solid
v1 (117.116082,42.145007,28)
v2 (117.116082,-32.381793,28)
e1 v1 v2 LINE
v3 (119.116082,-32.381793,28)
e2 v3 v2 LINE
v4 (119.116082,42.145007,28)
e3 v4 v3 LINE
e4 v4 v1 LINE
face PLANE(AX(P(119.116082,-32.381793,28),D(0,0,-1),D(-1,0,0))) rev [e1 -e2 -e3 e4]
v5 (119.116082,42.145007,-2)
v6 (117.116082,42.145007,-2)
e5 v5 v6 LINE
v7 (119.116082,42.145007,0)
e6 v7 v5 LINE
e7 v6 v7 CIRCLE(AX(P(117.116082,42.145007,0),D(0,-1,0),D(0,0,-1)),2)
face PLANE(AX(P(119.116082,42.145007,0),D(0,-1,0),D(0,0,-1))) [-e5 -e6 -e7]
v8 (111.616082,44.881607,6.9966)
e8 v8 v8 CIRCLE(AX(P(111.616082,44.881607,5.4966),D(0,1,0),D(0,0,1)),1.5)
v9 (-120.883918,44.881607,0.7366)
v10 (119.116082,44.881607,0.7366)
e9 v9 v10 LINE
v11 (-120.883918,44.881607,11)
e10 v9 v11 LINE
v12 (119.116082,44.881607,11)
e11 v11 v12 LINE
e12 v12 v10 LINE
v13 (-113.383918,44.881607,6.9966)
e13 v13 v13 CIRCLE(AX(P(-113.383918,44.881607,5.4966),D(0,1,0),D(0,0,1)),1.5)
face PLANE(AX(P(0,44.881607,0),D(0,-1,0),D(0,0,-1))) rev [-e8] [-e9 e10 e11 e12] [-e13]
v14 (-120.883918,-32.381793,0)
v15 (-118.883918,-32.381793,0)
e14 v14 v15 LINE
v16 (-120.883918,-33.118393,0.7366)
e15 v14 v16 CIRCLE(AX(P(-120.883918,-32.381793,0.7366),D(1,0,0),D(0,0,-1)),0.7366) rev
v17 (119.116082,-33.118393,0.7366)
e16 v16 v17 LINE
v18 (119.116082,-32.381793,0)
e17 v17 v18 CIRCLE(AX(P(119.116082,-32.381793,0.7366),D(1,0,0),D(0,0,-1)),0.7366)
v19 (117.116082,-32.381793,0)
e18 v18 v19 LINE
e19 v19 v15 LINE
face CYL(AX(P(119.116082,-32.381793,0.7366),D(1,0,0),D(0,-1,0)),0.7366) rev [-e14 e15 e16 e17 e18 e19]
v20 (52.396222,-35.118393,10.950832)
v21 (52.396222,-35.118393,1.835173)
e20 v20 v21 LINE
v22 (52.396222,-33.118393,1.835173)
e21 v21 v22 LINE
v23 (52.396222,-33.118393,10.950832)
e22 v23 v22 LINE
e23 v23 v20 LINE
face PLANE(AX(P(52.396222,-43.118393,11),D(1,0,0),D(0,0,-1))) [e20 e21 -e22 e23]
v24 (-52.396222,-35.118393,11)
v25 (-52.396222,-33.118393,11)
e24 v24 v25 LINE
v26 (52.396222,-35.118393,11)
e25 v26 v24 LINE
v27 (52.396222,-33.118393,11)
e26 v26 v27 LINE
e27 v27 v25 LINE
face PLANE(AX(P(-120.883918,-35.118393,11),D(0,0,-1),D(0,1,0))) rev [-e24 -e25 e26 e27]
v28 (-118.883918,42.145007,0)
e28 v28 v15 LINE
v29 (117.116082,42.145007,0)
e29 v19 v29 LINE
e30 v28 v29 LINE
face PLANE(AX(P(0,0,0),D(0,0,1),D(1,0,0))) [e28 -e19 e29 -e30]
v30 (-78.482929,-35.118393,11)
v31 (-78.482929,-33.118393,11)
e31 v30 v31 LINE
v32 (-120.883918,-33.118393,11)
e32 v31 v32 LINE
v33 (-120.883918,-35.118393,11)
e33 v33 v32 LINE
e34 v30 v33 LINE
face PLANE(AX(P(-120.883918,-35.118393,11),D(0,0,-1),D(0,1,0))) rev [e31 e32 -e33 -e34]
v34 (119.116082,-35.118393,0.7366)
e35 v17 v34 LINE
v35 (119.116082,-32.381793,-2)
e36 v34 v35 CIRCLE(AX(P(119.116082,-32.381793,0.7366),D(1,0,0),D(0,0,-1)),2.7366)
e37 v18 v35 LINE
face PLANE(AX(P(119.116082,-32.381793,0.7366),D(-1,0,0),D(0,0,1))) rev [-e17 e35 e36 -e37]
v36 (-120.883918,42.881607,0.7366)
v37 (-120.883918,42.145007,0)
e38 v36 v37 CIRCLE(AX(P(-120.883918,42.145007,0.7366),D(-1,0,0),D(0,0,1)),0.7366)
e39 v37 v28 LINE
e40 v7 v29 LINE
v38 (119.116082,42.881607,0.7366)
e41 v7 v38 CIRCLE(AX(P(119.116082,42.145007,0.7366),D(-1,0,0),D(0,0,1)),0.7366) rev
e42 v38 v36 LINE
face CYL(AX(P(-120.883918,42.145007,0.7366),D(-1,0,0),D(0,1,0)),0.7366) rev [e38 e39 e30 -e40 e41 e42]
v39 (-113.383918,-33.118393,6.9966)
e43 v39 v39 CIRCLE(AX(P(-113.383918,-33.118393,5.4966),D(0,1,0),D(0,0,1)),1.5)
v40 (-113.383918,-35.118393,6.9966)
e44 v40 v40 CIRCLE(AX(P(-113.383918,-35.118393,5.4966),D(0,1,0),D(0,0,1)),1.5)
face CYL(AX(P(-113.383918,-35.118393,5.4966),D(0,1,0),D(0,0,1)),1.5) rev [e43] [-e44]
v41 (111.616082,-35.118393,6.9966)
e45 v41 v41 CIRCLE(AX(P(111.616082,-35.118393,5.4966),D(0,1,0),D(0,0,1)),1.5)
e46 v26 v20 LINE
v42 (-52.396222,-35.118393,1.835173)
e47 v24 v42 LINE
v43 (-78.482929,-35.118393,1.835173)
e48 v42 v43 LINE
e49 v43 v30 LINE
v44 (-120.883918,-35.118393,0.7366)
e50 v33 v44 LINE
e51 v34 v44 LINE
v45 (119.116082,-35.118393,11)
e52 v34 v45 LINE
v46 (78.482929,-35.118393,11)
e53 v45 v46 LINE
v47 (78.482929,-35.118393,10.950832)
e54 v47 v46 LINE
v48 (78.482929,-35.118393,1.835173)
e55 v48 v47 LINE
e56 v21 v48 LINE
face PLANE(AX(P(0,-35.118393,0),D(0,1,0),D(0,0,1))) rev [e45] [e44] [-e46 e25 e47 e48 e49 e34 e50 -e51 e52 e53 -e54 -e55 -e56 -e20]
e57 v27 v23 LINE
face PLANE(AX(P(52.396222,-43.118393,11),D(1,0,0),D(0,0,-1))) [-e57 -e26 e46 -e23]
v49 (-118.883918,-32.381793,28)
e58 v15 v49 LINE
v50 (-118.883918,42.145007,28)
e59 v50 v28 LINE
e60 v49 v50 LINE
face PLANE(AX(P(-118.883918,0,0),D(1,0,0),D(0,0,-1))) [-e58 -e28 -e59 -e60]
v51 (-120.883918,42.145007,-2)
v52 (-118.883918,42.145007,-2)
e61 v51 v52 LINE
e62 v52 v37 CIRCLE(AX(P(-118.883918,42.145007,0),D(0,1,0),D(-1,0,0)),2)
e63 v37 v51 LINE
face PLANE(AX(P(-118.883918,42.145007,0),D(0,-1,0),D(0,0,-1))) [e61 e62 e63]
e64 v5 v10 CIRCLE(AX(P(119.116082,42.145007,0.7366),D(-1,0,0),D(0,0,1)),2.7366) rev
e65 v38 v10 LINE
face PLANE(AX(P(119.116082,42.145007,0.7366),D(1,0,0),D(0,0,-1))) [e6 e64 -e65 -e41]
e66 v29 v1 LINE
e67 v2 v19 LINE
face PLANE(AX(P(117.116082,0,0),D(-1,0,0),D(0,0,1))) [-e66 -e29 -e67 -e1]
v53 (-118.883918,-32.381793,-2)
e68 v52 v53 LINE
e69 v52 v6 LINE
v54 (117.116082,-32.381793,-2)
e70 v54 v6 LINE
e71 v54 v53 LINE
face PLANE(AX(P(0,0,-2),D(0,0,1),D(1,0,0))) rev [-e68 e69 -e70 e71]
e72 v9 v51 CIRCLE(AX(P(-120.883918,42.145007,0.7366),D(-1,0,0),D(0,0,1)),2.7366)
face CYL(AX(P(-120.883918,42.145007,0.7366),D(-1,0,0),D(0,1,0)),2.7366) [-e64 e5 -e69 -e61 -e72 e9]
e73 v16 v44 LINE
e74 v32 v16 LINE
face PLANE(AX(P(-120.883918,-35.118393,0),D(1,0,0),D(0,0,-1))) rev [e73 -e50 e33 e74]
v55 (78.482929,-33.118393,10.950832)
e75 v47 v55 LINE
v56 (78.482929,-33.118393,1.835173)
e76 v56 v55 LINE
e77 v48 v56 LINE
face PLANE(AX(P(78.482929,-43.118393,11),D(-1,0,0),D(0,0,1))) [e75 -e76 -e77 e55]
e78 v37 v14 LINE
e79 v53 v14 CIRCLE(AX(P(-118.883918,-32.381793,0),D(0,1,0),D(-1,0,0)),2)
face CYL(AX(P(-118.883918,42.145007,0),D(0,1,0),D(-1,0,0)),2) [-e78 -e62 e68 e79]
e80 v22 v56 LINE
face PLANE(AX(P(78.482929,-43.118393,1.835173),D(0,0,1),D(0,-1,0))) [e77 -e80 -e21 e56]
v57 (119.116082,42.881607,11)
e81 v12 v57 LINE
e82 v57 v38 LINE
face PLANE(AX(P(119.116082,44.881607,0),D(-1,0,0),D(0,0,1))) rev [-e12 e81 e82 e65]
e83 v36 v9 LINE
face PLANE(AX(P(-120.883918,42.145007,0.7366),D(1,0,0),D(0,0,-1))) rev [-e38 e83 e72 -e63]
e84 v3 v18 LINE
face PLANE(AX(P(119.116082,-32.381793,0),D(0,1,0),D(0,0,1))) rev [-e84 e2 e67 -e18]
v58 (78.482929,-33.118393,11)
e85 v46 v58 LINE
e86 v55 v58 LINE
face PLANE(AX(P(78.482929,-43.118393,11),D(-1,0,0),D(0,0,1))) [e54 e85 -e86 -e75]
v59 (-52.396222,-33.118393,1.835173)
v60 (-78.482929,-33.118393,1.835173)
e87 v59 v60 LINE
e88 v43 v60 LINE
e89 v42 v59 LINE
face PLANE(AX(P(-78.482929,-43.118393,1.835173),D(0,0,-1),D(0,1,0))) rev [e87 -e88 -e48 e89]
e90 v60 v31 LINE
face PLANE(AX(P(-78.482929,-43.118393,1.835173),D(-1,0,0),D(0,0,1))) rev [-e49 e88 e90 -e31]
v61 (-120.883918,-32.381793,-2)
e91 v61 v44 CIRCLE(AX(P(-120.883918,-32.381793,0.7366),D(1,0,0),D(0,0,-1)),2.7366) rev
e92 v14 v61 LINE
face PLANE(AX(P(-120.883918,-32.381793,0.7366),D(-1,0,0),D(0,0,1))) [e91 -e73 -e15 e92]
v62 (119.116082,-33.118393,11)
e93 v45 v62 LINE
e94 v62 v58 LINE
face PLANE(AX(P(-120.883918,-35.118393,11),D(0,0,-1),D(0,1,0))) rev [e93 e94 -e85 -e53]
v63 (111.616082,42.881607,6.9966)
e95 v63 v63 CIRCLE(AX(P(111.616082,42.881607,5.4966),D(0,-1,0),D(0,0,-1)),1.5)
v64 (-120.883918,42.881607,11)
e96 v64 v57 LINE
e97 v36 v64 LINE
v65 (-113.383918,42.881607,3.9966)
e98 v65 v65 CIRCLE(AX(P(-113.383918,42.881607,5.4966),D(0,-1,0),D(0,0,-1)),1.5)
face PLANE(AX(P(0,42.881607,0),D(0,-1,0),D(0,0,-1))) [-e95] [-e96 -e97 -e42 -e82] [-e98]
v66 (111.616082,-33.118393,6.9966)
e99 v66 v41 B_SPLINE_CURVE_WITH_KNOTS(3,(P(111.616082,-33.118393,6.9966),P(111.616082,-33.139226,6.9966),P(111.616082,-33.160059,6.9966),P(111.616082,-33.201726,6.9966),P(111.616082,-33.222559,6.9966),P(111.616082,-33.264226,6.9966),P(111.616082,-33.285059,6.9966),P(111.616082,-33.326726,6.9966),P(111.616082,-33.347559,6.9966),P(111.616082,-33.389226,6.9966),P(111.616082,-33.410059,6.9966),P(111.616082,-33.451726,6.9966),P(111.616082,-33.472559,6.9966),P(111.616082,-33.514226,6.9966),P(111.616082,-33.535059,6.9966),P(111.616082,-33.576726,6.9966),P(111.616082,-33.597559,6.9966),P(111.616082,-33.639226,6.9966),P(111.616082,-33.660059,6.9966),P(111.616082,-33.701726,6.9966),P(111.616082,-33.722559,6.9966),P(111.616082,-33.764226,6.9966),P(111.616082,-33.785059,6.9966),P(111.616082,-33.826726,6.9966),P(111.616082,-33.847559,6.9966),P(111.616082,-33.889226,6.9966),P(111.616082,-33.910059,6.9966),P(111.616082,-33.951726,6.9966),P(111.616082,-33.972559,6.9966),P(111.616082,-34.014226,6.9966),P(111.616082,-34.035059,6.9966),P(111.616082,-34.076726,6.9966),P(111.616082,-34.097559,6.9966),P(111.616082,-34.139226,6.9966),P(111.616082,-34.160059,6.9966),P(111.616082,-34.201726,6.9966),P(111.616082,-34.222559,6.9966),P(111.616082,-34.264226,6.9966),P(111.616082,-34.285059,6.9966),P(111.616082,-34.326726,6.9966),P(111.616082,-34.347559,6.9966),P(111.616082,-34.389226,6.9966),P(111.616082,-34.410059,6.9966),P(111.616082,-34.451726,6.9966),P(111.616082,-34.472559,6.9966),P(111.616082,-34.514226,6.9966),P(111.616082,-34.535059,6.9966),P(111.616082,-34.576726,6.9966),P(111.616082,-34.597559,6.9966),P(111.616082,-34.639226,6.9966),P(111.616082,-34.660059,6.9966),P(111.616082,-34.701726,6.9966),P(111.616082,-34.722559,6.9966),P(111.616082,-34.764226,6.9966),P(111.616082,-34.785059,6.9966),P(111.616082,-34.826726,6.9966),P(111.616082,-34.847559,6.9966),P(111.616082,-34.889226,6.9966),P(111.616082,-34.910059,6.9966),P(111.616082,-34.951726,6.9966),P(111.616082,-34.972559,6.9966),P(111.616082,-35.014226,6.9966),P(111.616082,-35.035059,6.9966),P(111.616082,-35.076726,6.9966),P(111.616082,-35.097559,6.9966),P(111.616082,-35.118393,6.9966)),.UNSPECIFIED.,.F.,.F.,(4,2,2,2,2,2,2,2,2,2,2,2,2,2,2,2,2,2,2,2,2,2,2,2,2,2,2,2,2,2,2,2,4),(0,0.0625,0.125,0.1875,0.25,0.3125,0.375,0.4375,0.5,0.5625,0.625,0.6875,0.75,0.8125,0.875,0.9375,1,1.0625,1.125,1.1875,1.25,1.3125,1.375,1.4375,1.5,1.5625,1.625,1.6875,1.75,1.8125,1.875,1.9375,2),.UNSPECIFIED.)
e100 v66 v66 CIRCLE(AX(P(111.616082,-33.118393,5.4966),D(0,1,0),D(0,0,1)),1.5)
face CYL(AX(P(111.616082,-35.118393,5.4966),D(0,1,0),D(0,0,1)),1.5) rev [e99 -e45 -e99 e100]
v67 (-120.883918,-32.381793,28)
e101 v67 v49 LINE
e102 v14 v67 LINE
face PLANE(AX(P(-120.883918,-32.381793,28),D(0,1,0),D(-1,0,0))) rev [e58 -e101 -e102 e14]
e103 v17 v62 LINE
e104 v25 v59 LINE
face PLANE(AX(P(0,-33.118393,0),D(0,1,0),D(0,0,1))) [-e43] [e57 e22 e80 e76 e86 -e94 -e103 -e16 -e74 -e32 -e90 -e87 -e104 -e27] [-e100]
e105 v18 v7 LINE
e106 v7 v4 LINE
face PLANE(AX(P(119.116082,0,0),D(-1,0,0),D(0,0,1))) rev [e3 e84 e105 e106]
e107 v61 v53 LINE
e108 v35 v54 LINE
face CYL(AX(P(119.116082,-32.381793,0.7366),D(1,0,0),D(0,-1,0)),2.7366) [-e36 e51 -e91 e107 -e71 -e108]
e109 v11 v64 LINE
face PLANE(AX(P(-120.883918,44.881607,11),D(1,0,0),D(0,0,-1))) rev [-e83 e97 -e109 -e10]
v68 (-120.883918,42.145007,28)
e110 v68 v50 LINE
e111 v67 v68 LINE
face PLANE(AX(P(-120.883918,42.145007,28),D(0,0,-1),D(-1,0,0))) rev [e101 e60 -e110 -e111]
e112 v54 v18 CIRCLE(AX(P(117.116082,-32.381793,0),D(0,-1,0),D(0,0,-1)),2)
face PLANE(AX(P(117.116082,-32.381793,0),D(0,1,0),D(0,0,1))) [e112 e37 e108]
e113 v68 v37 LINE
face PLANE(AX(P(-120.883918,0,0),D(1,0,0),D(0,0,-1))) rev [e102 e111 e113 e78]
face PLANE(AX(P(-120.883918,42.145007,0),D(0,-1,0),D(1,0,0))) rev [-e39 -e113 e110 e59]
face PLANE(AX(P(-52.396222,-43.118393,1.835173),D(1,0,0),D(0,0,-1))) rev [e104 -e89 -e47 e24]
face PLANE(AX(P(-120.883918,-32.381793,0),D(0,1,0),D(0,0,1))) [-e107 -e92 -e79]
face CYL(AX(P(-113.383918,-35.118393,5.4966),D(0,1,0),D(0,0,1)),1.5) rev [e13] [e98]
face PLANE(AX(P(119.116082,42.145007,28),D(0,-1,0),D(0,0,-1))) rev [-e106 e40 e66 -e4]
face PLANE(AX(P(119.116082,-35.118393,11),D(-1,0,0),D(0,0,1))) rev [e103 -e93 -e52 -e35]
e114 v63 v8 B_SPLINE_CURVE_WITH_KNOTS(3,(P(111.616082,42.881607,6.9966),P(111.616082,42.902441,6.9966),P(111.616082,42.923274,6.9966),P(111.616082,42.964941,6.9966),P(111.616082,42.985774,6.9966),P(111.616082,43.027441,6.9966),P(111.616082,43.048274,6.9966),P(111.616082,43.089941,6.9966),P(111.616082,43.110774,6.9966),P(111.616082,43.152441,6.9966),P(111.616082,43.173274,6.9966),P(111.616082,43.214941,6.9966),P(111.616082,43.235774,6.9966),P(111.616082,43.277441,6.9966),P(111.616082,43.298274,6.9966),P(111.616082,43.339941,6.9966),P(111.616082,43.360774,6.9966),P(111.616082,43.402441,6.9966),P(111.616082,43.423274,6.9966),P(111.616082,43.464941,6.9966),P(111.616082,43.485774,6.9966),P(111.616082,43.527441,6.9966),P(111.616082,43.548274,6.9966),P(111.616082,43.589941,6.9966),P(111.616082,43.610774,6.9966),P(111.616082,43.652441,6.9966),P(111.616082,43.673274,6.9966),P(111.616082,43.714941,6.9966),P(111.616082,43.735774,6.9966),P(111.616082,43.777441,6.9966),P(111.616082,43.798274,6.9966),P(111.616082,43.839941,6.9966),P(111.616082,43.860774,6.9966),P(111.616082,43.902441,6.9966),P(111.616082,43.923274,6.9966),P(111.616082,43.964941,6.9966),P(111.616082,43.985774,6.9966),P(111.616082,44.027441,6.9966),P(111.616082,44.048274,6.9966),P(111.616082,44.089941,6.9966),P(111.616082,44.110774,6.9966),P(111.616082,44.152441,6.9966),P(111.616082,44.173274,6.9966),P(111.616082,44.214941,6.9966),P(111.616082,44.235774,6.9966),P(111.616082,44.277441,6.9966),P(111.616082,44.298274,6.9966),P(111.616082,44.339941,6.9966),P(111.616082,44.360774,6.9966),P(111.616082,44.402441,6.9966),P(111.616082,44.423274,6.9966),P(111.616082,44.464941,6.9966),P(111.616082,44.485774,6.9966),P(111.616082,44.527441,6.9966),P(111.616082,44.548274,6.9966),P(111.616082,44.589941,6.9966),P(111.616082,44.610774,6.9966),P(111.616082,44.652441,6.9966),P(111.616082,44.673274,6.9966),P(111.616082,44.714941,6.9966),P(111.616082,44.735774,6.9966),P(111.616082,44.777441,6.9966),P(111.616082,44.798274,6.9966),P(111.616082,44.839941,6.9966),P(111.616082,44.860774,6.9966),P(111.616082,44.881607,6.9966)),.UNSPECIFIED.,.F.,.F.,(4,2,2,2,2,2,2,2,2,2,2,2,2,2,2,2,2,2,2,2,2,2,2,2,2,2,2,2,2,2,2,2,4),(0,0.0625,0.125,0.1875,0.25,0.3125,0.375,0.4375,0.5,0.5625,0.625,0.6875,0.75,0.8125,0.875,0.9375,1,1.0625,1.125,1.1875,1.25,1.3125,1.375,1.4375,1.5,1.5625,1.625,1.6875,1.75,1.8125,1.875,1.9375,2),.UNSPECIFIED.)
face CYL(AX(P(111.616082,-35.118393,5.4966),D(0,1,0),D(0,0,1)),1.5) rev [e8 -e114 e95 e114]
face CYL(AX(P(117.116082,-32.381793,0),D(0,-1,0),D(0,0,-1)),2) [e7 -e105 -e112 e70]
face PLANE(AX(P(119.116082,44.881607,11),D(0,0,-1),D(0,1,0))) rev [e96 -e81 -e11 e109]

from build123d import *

# Parameters (mm, degrees)
SKETCH31_W                     = 240
SKETCH31_H                     = 80
BASE_FLANGE1_DEPTH             = 2
EDGE_FLANGE1_STRIP_W           = 9.4732
EDGE_FLANGE1_STRIP_H           = 2
EDGE_FLANGE1_STRIP_CUT_DEPTH   = 240
EDGE_FLANGE1_STRIP_2_W         = 9.4732
EDGE_FLANGE1_STRIP_2_H         = 2
EDGE_FLANGE1_STRIP_CUT_2_DEPTH = 240
EDGE_FLANGE1_DEPTH             = 240
EDGE_FLANGE1_BEND_DEPTH        = 240
EDGE_FLANGE2_START             = -32.381792537
EDGE_FLANGE2_DEPTH             = 74.5268
EDGE_FLANGE2_2_OUTLINE_W       = 2
EDGE_FLANGE2_2_OUTLINE_H       = 28
EDGE_FLANGE2_2_DEPTH           = 74.5268
SKETCH52_W                     = 26.086706926
SKETCH52_H                     = 9.115658902
CUT_EXTRUDE2_DEPTH             = 10
SKETCH53_W                     = 26.086706926
SKETCH53_H                     = 0.049167759
CUT_EXTRUDE3_DEPTH             = 10
SKETCH61_R                     = 1.5
CUT_EXTRUDE8_DEPTH             = 148.637805464
SKETCH62_R                     = 1.5
CUT_EXTRUDE9_DEPTH             = 148.637805464


# Read off the part's stored shape, not the designer's step: Edge-Flange2
# Sheet-metal steps are written as plain solids
with BuildPart() as part:
    # Sketch31 → Base-Flange1 (new body)
    with BuildSketch(Plane.XY):
        with Locations((-0.883917881, 4.881607463)):
            Rectangle(SKETCH31_W, SKETCH31_H)
    extrude(amount=-BASE_FLANGE1_DEPTH)

    # Edge-Flange1 strip (across the edge) → Edge-Flange1 strip cut (cut)
    with BuildSketch(Plane(origin=(119.116082119, 44.881607463, 0), x_dir=(0, -1, 0), z_dir=(-1, 0, 0))):
        with Locations((-2, -1)):
            Rectangle(EDGE_FLANGE1_STRIP_W, EDGE_FLANGE1_STRIP_H)
    extrude(amount=EDGE_FLANGE1_STRIP_CUT_DEPTH, mode=Mode.SUBTRACT)

    # Edge-Flange1 strip 2 (across the edge) → Edge-Flange1 strip cut 2 (cut)
    with BuildSketch(Plane(origin=(-120.883917881, -35.118392537, 0), x_dir=(0, 1, 0), z_dir=(1, 0, 0))):
        with Locations((-2, -1)):
            Rectangle(EDGE_FLANGE1_STRIP_2_W, EDGE_FLANGE1_STRIP_2_H)
    extrude(amount=EDGE_FLANGE1_STRIP_CUT_2_DEPTH, mode=Mode.SUBTRACT)

    # Edge-Flange1 section (across the edge) → Edge-Flange1 (add)
    with BuildSketch(Plane(origin=(119.116082119, 44.881607463, 0), x_dir=(0, -1, 0), z_dir=(-1, 0, 0))):
        with BuildLine():
            Line((0, 0.7366), (0, 11))
            Line((0, 11), (2, 11))
            Line((2, 11), (2, 0.7366))
            ThreePointArc((2, 0.7366), (2.215745145, 0.215745145), (2.7366, 0))
            Line((2.7366, 0), (2.7366, -2))
            ThreePointArc((2.7366, -2), (0.801531583, -1.198468417), (0, 0.7366))
        make_face()
    extrude(amount=EDGE_FLANGE1_DEPTH)

    # Edge-Flange1 section 2 (across the edge) → Edge-Flange1 bend (add)
    with BuildSketch(Plane(origin=(-120.883917881, -35.118392537, 0), x_dir=(0, 1, 0), z_dir=(1, 0, 0))):
        with BuildLine():
            Line((0, 0.7366), (0, 11))
            Line((0, 11), (2, 11))
            Line((2, 11), (2, 0.7366))
            ThreePointArc((2, 0.7366), (2.215745145, 0.215745145), (2.7366, 0))
            Line((2.7366, 0), (2.7366, -2))
            ThreePointArc((2.7366, -2), (0.801531583, -1.198468417), (0, 0.7366))
        make_face()
    extrude(amount=EDGE_FLANGE1_BEND_DEPTH)

    # Edge-Flange2 outline → Edge-Flange2 (cut)
    with BuildSketch(Plane(origin=(0, 0, 0), x_dir=(1, 0, 0), z_dir=(0, 1, 0)).offset(EDGE_FLANGE2_START)):
        with BuildLine():
            ThreePointArc((117.116082119, 2), (118.530295681, 1.414213562), (119.116082119, 0))
            Line((119.116082119, 0), (119.116082119, 2))
            Line((119.116082119, 2), (117.116082119, 2))
        make_face()
        with BuildLine():
            ThreePointArc((-120.883917881, 0), (-120.298131443, 1.414213562), (-118.883917881, 2))
            Line((-118.883917881, 2), (-120.883917881, 2))
            Line((-120.883917881, 2), (-120.883917881, 0))
        make_face()
    extrude(amount=EDGE_FLANGE2_DEPTH, mode=Mode.SUBTRACT)

    # Edge-Flange2 2 outline → Edge-Flange2 2 (add)
    with BuildSketch(Plane(origin=(0, 0, 0), x_dir=(1, 0, 0), z_dir=(0, 1, 0)).offset(EDGE_FLANGE2_START)):
        with Locations((118.116082119, -14)):
            Rectangle(EDGE_FLANGE2_2_OUTLINE_W, EDGE_FLANGE2_2_OUTLINE_H)
        with Locations((-119.883917881, -14)):
            Rectangle(EDGE_FLANGE2_2_OUTLINE_W, EDGE_FLANGE2_2_OUTLINE_H)
    extrude(amount=EDGE_FLANGE2_2_DEPTH)

    # Sketch52 → Cut-Extrude2 (cut)
    with BuildSketch(Plane(origin=(0, -33.118392537, 0), x_dir=(1, 0, 0), z_dir=(0, 1, 0))):
        with Locations((-65.439575559, -6.39300279)):
            Rectangle(SKETCH52_W, SKETCH52_H)
    cut_extrude2 = extrude(amount=-CUT_EXTRUDE2_DEPTH, mode=Mode.SUBTRACT)

    # Sketch53 → Cut-Extrude3 (cut)
    with BuildSketch(Plane(origin=(0, -33.118392537, 0), x_dir=(1, 0, 0), z_dir=(0, 1, 0))):
        with Locations((-65.439575559, -10.975416121)):
            Rectangle(SKETCH53_W, SKETCH53_H)
    cut_extrude3 = extrude(amount=-CUT_EXTRUDE3_DEPTH, mode=Mode.SUBTRACT)

    # Mirror3: Cut-Extrude3 across plane
    add(cut_extrude3.mirror(Plane(origin=(0, 0, 0), x_dir=(0, 0, 1), z_dir=(1, 0, 0))), mode=Mode.SUBTRACT)

    # Mirror4: Cut-Extrude2, Cut-Extrude3 across plane
    add(cut_extrude2.mirror(Plane(origin=(0, 0, 0), x_dir=(0, 0, 1), z_dir=(1, 0, 0))), mode=Mode.SUBTRACT)
    add(cut_extrude3.mirror(Plane(origin=(0, 0, 0), x_dir=(0, 0, 1), z_dir=(1, 0, 0))), mode=Mode.SUBTRACT)

    # Sketch61 → Cut-Extrude8 (cut, through all)
    with BuildSketch(Plane(origin=(0, 44.881607463, 0), x_dir=(1, 0, 0), z_dir=(0, 1, 0))):
        with Locations(Location((111.616082119, -5.4966, 0), (0, 0, 270))):
            Circle(SKETCH61_R)
    extrude(amount=-CUT_EXTRUDE8_DEPTH, mode=Mode.SUBTRACT)

    # Sketch62 → Cut-Extrude9 (cut, through all)
    with BuildSketch(Plane(origin=(0, 44.881607463, 0), x_dir=(1, 0, 0), z_dir=(0, 1, 0))):
        with Locations(Location((-113.383917881, -5.4966, 0), (0, 0, 270))):
            Circle(SKETCH62_R)
    extrude(amount=-CUT_EXTRUDE9_DEPTH, mode=Mode.SUBTRACT)


solid = part.part
